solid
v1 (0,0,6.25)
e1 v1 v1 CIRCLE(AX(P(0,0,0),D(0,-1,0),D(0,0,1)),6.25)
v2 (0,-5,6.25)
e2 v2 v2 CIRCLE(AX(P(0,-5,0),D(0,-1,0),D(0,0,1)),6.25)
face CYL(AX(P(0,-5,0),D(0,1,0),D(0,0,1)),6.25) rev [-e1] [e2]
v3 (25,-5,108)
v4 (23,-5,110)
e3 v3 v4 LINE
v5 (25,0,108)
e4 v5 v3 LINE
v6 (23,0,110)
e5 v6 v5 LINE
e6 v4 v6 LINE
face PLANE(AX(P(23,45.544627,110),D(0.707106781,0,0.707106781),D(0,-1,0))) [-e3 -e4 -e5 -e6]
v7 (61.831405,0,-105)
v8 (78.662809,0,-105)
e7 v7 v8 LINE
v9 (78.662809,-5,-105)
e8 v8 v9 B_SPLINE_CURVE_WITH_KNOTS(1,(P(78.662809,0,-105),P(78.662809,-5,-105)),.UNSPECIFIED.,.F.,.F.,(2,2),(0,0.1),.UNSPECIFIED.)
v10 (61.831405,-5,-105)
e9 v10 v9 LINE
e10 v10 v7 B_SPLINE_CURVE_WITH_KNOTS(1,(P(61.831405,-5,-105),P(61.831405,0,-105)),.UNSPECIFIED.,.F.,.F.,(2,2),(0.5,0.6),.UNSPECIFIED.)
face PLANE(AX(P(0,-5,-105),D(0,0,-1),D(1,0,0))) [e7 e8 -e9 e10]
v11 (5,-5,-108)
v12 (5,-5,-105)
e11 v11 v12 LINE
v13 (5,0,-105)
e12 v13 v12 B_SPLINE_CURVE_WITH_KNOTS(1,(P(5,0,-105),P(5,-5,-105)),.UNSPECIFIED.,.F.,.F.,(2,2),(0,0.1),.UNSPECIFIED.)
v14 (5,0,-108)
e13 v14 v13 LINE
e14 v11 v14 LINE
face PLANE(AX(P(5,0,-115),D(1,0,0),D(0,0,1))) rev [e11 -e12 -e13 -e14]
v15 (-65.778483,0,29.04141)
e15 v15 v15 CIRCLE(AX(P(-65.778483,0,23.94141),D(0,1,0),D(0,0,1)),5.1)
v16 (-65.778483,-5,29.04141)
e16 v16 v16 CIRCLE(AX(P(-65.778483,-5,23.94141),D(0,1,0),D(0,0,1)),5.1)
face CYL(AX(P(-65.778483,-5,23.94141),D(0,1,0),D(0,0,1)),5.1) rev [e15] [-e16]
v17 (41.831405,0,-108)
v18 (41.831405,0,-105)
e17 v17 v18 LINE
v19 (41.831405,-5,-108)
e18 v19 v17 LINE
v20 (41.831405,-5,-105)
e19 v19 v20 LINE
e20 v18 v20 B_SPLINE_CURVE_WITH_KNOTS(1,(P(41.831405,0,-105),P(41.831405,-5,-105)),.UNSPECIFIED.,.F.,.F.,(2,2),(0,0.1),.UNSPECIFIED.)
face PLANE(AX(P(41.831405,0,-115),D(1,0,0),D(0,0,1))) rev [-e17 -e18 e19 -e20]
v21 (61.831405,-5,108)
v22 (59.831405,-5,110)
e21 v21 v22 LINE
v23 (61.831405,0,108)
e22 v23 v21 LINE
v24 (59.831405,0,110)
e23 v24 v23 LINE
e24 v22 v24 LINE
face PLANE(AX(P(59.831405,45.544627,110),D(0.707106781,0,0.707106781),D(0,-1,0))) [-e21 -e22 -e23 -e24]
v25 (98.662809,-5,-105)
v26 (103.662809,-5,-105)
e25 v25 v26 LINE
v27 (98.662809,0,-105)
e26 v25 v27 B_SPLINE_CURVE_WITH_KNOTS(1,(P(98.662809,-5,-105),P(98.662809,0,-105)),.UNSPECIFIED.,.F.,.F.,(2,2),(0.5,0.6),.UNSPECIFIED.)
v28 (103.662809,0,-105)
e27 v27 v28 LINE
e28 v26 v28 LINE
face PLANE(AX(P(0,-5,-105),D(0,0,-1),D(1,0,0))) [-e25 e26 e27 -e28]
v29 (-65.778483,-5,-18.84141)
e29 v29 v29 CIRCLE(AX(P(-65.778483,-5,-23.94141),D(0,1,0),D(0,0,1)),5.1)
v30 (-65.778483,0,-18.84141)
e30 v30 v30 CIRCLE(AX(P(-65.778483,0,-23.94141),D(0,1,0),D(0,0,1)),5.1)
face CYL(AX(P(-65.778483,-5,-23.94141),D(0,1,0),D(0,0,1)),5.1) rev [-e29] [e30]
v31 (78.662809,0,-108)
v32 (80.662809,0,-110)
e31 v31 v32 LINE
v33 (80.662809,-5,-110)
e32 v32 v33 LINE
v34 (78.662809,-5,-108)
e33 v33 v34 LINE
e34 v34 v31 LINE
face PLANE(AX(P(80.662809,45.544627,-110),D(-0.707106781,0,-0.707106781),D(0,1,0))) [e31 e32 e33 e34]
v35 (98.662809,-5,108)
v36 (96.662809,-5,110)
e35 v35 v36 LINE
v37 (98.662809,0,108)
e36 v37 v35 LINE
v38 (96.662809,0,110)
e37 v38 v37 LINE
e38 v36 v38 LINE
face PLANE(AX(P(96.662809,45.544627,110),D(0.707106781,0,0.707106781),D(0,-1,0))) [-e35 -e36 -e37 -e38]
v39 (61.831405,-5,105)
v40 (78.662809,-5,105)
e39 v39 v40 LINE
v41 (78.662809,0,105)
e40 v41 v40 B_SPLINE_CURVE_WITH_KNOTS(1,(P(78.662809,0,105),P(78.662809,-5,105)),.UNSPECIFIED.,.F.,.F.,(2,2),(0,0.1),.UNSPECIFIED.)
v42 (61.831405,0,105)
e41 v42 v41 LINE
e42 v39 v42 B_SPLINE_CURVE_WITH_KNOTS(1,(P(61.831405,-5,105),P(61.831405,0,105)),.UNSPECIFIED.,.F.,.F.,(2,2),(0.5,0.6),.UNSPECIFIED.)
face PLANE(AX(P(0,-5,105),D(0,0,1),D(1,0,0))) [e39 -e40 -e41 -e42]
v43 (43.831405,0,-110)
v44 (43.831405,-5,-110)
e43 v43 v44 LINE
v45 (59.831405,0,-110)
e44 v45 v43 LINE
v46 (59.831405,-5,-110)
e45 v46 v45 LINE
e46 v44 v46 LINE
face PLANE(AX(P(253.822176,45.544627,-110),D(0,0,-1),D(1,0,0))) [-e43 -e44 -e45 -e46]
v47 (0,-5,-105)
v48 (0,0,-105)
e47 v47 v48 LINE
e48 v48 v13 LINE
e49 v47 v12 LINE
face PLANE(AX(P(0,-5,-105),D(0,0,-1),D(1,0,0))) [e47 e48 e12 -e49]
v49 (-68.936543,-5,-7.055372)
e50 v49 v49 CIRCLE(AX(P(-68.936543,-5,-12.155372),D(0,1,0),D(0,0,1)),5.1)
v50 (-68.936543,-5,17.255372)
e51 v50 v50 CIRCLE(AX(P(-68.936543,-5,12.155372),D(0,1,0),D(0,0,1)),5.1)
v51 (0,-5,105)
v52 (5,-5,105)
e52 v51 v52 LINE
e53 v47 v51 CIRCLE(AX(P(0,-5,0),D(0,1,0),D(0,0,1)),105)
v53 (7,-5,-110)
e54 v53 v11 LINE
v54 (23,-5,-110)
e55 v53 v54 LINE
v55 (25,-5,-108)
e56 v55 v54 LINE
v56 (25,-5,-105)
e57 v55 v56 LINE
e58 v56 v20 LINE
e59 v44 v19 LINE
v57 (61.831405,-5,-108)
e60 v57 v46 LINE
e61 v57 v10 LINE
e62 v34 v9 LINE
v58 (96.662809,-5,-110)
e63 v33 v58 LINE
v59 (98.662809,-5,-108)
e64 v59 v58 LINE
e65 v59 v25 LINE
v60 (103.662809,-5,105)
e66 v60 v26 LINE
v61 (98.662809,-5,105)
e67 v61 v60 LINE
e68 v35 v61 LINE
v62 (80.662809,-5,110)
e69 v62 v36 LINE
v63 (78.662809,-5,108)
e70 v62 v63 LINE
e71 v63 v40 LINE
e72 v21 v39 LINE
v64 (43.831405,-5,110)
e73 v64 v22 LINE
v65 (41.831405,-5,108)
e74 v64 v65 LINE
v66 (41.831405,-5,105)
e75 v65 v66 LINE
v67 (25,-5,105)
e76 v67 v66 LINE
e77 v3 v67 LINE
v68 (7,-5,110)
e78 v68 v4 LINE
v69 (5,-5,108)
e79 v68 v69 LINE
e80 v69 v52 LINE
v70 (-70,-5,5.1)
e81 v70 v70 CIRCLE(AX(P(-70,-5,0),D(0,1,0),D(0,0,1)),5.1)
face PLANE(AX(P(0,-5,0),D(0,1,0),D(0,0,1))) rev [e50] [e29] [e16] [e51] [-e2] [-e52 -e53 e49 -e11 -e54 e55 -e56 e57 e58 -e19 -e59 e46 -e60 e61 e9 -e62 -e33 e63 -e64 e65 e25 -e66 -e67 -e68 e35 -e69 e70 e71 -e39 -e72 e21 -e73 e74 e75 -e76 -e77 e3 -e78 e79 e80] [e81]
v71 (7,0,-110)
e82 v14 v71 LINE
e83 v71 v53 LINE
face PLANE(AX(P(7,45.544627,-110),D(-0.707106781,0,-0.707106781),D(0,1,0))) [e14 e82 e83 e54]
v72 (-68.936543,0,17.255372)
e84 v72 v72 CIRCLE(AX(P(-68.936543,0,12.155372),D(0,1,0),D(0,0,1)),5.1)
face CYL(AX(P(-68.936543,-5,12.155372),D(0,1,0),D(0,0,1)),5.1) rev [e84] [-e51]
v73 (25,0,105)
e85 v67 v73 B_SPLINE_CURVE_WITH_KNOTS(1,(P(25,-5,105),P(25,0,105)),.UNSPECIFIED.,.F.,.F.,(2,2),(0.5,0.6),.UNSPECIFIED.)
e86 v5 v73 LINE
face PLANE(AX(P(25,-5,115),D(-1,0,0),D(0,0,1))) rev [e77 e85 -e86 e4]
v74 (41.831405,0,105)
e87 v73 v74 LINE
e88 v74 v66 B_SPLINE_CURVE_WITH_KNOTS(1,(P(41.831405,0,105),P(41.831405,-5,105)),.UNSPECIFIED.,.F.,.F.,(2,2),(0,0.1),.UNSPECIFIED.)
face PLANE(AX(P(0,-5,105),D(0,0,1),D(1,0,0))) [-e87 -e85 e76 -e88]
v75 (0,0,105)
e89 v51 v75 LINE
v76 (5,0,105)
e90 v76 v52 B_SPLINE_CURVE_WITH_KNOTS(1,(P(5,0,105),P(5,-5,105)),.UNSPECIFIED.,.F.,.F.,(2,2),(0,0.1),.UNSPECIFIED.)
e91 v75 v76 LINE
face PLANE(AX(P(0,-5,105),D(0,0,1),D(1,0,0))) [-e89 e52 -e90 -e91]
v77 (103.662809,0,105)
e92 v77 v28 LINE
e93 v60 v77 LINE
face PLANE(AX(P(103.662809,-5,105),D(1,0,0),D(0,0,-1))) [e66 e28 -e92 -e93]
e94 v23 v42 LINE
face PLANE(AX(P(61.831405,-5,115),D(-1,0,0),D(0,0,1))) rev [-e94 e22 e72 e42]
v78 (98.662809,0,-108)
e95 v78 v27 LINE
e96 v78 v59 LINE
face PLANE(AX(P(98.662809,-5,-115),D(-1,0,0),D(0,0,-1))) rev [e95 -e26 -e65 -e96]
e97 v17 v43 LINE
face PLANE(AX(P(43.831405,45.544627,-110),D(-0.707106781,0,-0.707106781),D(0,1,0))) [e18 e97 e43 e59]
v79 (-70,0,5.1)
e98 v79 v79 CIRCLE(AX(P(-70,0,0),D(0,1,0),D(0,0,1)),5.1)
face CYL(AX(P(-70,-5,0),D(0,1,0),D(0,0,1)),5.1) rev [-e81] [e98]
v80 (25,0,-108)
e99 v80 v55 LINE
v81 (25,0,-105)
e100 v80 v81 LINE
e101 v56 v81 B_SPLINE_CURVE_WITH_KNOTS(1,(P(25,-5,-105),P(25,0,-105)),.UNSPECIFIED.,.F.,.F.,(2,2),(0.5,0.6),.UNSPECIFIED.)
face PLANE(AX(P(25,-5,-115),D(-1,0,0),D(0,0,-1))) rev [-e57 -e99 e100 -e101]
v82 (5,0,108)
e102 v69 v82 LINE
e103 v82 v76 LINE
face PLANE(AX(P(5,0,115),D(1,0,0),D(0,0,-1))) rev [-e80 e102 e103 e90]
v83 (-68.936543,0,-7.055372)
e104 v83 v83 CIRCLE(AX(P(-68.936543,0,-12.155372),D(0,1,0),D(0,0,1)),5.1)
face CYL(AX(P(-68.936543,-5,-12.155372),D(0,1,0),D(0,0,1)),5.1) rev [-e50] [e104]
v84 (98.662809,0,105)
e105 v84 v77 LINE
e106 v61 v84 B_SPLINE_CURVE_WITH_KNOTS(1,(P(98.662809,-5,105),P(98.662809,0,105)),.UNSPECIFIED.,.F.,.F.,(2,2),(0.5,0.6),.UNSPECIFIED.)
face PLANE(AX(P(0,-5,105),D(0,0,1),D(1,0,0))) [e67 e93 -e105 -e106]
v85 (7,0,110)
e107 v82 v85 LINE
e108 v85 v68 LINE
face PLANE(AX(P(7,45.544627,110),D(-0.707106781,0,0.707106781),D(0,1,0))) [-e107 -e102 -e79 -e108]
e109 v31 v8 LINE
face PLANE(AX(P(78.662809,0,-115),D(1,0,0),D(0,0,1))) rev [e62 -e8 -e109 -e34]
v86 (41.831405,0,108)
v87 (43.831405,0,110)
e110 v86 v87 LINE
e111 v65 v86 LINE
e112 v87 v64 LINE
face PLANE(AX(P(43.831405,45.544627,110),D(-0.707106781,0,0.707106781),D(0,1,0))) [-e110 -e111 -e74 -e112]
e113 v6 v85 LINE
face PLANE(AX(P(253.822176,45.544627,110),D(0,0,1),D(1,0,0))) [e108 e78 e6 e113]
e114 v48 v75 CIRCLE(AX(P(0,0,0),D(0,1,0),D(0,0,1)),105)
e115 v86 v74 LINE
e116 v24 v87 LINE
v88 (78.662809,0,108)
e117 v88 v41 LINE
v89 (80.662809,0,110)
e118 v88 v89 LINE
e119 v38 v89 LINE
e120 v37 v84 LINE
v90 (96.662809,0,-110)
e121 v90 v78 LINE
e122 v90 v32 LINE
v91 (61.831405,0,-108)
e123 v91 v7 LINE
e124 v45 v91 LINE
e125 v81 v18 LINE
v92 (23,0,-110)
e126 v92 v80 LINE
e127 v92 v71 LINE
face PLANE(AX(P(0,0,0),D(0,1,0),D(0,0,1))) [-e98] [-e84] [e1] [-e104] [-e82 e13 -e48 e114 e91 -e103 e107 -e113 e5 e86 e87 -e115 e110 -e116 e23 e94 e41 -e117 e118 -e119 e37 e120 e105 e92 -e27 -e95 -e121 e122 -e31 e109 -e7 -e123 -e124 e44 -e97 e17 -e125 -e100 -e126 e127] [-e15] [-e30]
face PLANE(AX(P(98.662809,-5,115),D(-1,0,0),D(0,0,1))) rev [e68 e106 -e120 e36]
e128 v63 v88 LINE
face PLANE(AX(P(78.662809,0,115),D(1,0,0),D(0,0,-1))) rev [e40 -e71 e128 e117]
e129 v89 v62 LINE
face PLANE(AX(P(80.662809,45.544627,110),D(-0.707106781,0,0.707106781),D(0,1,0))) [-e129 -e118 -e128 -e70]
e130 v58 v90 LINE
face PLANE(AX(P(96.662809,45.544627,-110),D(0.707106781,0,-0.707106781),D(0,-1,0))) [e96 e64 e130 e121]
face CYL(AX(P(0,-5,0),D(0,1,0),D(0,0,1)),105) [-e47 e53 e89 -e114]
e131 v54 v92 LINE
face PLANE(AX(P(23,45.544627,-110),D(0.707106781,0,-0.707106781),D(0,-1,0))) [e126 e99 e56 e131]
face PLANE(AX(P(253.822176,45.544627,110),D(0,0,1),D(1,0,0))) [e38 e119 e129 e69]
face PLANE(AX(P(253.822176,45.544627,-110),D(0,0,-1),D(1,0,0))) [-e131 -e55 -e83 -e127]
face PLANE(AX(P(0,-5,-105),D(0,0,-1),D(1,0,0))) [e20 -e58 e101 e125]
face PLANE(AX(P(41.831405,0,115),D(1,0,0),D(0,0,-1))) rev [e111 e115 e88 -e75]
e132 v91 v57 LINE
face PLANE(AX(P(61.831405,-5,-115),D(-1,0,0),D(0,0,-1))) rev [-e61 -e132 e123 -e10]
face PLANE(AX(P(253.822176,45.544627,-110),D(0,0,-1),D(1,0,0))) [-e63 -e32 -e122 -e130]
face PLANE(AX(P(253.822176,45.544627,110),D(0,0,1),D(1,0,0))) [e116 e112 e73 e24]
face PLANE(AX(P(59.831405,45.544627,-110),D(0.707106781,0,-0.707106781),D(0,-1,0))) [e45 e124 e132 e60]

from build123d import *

# Parameters (mm, degrees)
SM_BASE_FLANGE_1_DEPTH = 5
OTHER_START            = -5
OTHER_1_DEPTH          = 5
SKETCH_8_R             = 5.1
CUT_EXTRUDE_1_DEPTH    = 153.151240547


# Read off the part's stored shape, not the designer's step: Выступы и прорези-Выступ1
# Sheet-metal steps are written as plain solids
with BuildPart() as part:
    # Sketch 1 → Базовая кромка1 (new body)
    with BuildSketch(Plane(origin=(0, 0, 0), x_dir=(1, 0, 0), z_dir=(0, 1, 0))):
        with BuildLine():
            Line((0, -105), (103.662809462, -105))
            Line((103.662809462, -105), (103.662809462, 0))
            Line((103.662809462, 0), (6.25, 0))
            ThreePointArc((6.25, 0), (0, -6.25), (-6.25, 0))
            Line((-6.25, 0), (-105, 0))
            ThreePointArc((-105, 0), (-74.246212025, -74.246212025), (0, -105))
        make_face()
    extrude(amount=-SM_BASE_FLANGE_1_DEPTH)

    # Other 1 outline → Other 1 (add)
    with BuildSketch(Plane(origin=(0, 0, 0), x_dir=(1, 0, 0), z_dir=(0, 1, 0)).offset(OTHER_START)):
        Polygon((98.662809462, -105), (78.662809462, -105), (78.662809462, -108), (80.662809462, -110), (96.662809462, -110), (98.662809462, -108), align=None)
        Polygon((61.831404731, -105), (41.831404731, -105), (41.831404731, -108), (43.831404731, -110), (59.831404731, -110), (61.831404731, -108), align=None)
        Polygon((5, -105), (5, -108), (7, -110), (23, -110), (25, -108), (25, -105), align=None)
    extrude(amount=OTHER_1_DEPTH)

    # Зеркальное отражение1: part across plane


with BuildPart() as part_1:
    add(part.part)
    add(part.part.mirror(Plane(origin=(6.25, -5, 0), x_dir=(1, 0, 0), z_dir=(0, 0, -1))))

    # Эскиз8 → Вырез-Вытянуть1 (cut, through all)
    with BuildSketch(Plane(origin=(0, 0, 0), x_dir=(1, 0, 0), z_dir=(0, 1, 0))):
        with Locations(Location((-65.778483455, 23.941410033, 0), (0, 0, 270))):
            Circle(SKETCH_8_R)
        with Locations(Location((-68.936542711, 12.155372437, 0), (0, 0, 270))):
            Circle(SKETCH_8_R)
        with Locations(Location((-70, 0, 0), (0, 0, 270))):
            Circle(SKETCH_8_R)
        with Locations(Location((-68.936542711, -12.155372437, 0), (0, 0, 270))):
            Circle(SKETCH_8_R)
        with Locations(Location((-65.778483455, -23.941410033, 0), (0, 0, 270))):
            Circle(SKETCH_8_R)
    extrude(amount=-CUT_EXTRUDE_1_DEPTH, mode=Mode.SUBTRACT)


solid = part_1.part
